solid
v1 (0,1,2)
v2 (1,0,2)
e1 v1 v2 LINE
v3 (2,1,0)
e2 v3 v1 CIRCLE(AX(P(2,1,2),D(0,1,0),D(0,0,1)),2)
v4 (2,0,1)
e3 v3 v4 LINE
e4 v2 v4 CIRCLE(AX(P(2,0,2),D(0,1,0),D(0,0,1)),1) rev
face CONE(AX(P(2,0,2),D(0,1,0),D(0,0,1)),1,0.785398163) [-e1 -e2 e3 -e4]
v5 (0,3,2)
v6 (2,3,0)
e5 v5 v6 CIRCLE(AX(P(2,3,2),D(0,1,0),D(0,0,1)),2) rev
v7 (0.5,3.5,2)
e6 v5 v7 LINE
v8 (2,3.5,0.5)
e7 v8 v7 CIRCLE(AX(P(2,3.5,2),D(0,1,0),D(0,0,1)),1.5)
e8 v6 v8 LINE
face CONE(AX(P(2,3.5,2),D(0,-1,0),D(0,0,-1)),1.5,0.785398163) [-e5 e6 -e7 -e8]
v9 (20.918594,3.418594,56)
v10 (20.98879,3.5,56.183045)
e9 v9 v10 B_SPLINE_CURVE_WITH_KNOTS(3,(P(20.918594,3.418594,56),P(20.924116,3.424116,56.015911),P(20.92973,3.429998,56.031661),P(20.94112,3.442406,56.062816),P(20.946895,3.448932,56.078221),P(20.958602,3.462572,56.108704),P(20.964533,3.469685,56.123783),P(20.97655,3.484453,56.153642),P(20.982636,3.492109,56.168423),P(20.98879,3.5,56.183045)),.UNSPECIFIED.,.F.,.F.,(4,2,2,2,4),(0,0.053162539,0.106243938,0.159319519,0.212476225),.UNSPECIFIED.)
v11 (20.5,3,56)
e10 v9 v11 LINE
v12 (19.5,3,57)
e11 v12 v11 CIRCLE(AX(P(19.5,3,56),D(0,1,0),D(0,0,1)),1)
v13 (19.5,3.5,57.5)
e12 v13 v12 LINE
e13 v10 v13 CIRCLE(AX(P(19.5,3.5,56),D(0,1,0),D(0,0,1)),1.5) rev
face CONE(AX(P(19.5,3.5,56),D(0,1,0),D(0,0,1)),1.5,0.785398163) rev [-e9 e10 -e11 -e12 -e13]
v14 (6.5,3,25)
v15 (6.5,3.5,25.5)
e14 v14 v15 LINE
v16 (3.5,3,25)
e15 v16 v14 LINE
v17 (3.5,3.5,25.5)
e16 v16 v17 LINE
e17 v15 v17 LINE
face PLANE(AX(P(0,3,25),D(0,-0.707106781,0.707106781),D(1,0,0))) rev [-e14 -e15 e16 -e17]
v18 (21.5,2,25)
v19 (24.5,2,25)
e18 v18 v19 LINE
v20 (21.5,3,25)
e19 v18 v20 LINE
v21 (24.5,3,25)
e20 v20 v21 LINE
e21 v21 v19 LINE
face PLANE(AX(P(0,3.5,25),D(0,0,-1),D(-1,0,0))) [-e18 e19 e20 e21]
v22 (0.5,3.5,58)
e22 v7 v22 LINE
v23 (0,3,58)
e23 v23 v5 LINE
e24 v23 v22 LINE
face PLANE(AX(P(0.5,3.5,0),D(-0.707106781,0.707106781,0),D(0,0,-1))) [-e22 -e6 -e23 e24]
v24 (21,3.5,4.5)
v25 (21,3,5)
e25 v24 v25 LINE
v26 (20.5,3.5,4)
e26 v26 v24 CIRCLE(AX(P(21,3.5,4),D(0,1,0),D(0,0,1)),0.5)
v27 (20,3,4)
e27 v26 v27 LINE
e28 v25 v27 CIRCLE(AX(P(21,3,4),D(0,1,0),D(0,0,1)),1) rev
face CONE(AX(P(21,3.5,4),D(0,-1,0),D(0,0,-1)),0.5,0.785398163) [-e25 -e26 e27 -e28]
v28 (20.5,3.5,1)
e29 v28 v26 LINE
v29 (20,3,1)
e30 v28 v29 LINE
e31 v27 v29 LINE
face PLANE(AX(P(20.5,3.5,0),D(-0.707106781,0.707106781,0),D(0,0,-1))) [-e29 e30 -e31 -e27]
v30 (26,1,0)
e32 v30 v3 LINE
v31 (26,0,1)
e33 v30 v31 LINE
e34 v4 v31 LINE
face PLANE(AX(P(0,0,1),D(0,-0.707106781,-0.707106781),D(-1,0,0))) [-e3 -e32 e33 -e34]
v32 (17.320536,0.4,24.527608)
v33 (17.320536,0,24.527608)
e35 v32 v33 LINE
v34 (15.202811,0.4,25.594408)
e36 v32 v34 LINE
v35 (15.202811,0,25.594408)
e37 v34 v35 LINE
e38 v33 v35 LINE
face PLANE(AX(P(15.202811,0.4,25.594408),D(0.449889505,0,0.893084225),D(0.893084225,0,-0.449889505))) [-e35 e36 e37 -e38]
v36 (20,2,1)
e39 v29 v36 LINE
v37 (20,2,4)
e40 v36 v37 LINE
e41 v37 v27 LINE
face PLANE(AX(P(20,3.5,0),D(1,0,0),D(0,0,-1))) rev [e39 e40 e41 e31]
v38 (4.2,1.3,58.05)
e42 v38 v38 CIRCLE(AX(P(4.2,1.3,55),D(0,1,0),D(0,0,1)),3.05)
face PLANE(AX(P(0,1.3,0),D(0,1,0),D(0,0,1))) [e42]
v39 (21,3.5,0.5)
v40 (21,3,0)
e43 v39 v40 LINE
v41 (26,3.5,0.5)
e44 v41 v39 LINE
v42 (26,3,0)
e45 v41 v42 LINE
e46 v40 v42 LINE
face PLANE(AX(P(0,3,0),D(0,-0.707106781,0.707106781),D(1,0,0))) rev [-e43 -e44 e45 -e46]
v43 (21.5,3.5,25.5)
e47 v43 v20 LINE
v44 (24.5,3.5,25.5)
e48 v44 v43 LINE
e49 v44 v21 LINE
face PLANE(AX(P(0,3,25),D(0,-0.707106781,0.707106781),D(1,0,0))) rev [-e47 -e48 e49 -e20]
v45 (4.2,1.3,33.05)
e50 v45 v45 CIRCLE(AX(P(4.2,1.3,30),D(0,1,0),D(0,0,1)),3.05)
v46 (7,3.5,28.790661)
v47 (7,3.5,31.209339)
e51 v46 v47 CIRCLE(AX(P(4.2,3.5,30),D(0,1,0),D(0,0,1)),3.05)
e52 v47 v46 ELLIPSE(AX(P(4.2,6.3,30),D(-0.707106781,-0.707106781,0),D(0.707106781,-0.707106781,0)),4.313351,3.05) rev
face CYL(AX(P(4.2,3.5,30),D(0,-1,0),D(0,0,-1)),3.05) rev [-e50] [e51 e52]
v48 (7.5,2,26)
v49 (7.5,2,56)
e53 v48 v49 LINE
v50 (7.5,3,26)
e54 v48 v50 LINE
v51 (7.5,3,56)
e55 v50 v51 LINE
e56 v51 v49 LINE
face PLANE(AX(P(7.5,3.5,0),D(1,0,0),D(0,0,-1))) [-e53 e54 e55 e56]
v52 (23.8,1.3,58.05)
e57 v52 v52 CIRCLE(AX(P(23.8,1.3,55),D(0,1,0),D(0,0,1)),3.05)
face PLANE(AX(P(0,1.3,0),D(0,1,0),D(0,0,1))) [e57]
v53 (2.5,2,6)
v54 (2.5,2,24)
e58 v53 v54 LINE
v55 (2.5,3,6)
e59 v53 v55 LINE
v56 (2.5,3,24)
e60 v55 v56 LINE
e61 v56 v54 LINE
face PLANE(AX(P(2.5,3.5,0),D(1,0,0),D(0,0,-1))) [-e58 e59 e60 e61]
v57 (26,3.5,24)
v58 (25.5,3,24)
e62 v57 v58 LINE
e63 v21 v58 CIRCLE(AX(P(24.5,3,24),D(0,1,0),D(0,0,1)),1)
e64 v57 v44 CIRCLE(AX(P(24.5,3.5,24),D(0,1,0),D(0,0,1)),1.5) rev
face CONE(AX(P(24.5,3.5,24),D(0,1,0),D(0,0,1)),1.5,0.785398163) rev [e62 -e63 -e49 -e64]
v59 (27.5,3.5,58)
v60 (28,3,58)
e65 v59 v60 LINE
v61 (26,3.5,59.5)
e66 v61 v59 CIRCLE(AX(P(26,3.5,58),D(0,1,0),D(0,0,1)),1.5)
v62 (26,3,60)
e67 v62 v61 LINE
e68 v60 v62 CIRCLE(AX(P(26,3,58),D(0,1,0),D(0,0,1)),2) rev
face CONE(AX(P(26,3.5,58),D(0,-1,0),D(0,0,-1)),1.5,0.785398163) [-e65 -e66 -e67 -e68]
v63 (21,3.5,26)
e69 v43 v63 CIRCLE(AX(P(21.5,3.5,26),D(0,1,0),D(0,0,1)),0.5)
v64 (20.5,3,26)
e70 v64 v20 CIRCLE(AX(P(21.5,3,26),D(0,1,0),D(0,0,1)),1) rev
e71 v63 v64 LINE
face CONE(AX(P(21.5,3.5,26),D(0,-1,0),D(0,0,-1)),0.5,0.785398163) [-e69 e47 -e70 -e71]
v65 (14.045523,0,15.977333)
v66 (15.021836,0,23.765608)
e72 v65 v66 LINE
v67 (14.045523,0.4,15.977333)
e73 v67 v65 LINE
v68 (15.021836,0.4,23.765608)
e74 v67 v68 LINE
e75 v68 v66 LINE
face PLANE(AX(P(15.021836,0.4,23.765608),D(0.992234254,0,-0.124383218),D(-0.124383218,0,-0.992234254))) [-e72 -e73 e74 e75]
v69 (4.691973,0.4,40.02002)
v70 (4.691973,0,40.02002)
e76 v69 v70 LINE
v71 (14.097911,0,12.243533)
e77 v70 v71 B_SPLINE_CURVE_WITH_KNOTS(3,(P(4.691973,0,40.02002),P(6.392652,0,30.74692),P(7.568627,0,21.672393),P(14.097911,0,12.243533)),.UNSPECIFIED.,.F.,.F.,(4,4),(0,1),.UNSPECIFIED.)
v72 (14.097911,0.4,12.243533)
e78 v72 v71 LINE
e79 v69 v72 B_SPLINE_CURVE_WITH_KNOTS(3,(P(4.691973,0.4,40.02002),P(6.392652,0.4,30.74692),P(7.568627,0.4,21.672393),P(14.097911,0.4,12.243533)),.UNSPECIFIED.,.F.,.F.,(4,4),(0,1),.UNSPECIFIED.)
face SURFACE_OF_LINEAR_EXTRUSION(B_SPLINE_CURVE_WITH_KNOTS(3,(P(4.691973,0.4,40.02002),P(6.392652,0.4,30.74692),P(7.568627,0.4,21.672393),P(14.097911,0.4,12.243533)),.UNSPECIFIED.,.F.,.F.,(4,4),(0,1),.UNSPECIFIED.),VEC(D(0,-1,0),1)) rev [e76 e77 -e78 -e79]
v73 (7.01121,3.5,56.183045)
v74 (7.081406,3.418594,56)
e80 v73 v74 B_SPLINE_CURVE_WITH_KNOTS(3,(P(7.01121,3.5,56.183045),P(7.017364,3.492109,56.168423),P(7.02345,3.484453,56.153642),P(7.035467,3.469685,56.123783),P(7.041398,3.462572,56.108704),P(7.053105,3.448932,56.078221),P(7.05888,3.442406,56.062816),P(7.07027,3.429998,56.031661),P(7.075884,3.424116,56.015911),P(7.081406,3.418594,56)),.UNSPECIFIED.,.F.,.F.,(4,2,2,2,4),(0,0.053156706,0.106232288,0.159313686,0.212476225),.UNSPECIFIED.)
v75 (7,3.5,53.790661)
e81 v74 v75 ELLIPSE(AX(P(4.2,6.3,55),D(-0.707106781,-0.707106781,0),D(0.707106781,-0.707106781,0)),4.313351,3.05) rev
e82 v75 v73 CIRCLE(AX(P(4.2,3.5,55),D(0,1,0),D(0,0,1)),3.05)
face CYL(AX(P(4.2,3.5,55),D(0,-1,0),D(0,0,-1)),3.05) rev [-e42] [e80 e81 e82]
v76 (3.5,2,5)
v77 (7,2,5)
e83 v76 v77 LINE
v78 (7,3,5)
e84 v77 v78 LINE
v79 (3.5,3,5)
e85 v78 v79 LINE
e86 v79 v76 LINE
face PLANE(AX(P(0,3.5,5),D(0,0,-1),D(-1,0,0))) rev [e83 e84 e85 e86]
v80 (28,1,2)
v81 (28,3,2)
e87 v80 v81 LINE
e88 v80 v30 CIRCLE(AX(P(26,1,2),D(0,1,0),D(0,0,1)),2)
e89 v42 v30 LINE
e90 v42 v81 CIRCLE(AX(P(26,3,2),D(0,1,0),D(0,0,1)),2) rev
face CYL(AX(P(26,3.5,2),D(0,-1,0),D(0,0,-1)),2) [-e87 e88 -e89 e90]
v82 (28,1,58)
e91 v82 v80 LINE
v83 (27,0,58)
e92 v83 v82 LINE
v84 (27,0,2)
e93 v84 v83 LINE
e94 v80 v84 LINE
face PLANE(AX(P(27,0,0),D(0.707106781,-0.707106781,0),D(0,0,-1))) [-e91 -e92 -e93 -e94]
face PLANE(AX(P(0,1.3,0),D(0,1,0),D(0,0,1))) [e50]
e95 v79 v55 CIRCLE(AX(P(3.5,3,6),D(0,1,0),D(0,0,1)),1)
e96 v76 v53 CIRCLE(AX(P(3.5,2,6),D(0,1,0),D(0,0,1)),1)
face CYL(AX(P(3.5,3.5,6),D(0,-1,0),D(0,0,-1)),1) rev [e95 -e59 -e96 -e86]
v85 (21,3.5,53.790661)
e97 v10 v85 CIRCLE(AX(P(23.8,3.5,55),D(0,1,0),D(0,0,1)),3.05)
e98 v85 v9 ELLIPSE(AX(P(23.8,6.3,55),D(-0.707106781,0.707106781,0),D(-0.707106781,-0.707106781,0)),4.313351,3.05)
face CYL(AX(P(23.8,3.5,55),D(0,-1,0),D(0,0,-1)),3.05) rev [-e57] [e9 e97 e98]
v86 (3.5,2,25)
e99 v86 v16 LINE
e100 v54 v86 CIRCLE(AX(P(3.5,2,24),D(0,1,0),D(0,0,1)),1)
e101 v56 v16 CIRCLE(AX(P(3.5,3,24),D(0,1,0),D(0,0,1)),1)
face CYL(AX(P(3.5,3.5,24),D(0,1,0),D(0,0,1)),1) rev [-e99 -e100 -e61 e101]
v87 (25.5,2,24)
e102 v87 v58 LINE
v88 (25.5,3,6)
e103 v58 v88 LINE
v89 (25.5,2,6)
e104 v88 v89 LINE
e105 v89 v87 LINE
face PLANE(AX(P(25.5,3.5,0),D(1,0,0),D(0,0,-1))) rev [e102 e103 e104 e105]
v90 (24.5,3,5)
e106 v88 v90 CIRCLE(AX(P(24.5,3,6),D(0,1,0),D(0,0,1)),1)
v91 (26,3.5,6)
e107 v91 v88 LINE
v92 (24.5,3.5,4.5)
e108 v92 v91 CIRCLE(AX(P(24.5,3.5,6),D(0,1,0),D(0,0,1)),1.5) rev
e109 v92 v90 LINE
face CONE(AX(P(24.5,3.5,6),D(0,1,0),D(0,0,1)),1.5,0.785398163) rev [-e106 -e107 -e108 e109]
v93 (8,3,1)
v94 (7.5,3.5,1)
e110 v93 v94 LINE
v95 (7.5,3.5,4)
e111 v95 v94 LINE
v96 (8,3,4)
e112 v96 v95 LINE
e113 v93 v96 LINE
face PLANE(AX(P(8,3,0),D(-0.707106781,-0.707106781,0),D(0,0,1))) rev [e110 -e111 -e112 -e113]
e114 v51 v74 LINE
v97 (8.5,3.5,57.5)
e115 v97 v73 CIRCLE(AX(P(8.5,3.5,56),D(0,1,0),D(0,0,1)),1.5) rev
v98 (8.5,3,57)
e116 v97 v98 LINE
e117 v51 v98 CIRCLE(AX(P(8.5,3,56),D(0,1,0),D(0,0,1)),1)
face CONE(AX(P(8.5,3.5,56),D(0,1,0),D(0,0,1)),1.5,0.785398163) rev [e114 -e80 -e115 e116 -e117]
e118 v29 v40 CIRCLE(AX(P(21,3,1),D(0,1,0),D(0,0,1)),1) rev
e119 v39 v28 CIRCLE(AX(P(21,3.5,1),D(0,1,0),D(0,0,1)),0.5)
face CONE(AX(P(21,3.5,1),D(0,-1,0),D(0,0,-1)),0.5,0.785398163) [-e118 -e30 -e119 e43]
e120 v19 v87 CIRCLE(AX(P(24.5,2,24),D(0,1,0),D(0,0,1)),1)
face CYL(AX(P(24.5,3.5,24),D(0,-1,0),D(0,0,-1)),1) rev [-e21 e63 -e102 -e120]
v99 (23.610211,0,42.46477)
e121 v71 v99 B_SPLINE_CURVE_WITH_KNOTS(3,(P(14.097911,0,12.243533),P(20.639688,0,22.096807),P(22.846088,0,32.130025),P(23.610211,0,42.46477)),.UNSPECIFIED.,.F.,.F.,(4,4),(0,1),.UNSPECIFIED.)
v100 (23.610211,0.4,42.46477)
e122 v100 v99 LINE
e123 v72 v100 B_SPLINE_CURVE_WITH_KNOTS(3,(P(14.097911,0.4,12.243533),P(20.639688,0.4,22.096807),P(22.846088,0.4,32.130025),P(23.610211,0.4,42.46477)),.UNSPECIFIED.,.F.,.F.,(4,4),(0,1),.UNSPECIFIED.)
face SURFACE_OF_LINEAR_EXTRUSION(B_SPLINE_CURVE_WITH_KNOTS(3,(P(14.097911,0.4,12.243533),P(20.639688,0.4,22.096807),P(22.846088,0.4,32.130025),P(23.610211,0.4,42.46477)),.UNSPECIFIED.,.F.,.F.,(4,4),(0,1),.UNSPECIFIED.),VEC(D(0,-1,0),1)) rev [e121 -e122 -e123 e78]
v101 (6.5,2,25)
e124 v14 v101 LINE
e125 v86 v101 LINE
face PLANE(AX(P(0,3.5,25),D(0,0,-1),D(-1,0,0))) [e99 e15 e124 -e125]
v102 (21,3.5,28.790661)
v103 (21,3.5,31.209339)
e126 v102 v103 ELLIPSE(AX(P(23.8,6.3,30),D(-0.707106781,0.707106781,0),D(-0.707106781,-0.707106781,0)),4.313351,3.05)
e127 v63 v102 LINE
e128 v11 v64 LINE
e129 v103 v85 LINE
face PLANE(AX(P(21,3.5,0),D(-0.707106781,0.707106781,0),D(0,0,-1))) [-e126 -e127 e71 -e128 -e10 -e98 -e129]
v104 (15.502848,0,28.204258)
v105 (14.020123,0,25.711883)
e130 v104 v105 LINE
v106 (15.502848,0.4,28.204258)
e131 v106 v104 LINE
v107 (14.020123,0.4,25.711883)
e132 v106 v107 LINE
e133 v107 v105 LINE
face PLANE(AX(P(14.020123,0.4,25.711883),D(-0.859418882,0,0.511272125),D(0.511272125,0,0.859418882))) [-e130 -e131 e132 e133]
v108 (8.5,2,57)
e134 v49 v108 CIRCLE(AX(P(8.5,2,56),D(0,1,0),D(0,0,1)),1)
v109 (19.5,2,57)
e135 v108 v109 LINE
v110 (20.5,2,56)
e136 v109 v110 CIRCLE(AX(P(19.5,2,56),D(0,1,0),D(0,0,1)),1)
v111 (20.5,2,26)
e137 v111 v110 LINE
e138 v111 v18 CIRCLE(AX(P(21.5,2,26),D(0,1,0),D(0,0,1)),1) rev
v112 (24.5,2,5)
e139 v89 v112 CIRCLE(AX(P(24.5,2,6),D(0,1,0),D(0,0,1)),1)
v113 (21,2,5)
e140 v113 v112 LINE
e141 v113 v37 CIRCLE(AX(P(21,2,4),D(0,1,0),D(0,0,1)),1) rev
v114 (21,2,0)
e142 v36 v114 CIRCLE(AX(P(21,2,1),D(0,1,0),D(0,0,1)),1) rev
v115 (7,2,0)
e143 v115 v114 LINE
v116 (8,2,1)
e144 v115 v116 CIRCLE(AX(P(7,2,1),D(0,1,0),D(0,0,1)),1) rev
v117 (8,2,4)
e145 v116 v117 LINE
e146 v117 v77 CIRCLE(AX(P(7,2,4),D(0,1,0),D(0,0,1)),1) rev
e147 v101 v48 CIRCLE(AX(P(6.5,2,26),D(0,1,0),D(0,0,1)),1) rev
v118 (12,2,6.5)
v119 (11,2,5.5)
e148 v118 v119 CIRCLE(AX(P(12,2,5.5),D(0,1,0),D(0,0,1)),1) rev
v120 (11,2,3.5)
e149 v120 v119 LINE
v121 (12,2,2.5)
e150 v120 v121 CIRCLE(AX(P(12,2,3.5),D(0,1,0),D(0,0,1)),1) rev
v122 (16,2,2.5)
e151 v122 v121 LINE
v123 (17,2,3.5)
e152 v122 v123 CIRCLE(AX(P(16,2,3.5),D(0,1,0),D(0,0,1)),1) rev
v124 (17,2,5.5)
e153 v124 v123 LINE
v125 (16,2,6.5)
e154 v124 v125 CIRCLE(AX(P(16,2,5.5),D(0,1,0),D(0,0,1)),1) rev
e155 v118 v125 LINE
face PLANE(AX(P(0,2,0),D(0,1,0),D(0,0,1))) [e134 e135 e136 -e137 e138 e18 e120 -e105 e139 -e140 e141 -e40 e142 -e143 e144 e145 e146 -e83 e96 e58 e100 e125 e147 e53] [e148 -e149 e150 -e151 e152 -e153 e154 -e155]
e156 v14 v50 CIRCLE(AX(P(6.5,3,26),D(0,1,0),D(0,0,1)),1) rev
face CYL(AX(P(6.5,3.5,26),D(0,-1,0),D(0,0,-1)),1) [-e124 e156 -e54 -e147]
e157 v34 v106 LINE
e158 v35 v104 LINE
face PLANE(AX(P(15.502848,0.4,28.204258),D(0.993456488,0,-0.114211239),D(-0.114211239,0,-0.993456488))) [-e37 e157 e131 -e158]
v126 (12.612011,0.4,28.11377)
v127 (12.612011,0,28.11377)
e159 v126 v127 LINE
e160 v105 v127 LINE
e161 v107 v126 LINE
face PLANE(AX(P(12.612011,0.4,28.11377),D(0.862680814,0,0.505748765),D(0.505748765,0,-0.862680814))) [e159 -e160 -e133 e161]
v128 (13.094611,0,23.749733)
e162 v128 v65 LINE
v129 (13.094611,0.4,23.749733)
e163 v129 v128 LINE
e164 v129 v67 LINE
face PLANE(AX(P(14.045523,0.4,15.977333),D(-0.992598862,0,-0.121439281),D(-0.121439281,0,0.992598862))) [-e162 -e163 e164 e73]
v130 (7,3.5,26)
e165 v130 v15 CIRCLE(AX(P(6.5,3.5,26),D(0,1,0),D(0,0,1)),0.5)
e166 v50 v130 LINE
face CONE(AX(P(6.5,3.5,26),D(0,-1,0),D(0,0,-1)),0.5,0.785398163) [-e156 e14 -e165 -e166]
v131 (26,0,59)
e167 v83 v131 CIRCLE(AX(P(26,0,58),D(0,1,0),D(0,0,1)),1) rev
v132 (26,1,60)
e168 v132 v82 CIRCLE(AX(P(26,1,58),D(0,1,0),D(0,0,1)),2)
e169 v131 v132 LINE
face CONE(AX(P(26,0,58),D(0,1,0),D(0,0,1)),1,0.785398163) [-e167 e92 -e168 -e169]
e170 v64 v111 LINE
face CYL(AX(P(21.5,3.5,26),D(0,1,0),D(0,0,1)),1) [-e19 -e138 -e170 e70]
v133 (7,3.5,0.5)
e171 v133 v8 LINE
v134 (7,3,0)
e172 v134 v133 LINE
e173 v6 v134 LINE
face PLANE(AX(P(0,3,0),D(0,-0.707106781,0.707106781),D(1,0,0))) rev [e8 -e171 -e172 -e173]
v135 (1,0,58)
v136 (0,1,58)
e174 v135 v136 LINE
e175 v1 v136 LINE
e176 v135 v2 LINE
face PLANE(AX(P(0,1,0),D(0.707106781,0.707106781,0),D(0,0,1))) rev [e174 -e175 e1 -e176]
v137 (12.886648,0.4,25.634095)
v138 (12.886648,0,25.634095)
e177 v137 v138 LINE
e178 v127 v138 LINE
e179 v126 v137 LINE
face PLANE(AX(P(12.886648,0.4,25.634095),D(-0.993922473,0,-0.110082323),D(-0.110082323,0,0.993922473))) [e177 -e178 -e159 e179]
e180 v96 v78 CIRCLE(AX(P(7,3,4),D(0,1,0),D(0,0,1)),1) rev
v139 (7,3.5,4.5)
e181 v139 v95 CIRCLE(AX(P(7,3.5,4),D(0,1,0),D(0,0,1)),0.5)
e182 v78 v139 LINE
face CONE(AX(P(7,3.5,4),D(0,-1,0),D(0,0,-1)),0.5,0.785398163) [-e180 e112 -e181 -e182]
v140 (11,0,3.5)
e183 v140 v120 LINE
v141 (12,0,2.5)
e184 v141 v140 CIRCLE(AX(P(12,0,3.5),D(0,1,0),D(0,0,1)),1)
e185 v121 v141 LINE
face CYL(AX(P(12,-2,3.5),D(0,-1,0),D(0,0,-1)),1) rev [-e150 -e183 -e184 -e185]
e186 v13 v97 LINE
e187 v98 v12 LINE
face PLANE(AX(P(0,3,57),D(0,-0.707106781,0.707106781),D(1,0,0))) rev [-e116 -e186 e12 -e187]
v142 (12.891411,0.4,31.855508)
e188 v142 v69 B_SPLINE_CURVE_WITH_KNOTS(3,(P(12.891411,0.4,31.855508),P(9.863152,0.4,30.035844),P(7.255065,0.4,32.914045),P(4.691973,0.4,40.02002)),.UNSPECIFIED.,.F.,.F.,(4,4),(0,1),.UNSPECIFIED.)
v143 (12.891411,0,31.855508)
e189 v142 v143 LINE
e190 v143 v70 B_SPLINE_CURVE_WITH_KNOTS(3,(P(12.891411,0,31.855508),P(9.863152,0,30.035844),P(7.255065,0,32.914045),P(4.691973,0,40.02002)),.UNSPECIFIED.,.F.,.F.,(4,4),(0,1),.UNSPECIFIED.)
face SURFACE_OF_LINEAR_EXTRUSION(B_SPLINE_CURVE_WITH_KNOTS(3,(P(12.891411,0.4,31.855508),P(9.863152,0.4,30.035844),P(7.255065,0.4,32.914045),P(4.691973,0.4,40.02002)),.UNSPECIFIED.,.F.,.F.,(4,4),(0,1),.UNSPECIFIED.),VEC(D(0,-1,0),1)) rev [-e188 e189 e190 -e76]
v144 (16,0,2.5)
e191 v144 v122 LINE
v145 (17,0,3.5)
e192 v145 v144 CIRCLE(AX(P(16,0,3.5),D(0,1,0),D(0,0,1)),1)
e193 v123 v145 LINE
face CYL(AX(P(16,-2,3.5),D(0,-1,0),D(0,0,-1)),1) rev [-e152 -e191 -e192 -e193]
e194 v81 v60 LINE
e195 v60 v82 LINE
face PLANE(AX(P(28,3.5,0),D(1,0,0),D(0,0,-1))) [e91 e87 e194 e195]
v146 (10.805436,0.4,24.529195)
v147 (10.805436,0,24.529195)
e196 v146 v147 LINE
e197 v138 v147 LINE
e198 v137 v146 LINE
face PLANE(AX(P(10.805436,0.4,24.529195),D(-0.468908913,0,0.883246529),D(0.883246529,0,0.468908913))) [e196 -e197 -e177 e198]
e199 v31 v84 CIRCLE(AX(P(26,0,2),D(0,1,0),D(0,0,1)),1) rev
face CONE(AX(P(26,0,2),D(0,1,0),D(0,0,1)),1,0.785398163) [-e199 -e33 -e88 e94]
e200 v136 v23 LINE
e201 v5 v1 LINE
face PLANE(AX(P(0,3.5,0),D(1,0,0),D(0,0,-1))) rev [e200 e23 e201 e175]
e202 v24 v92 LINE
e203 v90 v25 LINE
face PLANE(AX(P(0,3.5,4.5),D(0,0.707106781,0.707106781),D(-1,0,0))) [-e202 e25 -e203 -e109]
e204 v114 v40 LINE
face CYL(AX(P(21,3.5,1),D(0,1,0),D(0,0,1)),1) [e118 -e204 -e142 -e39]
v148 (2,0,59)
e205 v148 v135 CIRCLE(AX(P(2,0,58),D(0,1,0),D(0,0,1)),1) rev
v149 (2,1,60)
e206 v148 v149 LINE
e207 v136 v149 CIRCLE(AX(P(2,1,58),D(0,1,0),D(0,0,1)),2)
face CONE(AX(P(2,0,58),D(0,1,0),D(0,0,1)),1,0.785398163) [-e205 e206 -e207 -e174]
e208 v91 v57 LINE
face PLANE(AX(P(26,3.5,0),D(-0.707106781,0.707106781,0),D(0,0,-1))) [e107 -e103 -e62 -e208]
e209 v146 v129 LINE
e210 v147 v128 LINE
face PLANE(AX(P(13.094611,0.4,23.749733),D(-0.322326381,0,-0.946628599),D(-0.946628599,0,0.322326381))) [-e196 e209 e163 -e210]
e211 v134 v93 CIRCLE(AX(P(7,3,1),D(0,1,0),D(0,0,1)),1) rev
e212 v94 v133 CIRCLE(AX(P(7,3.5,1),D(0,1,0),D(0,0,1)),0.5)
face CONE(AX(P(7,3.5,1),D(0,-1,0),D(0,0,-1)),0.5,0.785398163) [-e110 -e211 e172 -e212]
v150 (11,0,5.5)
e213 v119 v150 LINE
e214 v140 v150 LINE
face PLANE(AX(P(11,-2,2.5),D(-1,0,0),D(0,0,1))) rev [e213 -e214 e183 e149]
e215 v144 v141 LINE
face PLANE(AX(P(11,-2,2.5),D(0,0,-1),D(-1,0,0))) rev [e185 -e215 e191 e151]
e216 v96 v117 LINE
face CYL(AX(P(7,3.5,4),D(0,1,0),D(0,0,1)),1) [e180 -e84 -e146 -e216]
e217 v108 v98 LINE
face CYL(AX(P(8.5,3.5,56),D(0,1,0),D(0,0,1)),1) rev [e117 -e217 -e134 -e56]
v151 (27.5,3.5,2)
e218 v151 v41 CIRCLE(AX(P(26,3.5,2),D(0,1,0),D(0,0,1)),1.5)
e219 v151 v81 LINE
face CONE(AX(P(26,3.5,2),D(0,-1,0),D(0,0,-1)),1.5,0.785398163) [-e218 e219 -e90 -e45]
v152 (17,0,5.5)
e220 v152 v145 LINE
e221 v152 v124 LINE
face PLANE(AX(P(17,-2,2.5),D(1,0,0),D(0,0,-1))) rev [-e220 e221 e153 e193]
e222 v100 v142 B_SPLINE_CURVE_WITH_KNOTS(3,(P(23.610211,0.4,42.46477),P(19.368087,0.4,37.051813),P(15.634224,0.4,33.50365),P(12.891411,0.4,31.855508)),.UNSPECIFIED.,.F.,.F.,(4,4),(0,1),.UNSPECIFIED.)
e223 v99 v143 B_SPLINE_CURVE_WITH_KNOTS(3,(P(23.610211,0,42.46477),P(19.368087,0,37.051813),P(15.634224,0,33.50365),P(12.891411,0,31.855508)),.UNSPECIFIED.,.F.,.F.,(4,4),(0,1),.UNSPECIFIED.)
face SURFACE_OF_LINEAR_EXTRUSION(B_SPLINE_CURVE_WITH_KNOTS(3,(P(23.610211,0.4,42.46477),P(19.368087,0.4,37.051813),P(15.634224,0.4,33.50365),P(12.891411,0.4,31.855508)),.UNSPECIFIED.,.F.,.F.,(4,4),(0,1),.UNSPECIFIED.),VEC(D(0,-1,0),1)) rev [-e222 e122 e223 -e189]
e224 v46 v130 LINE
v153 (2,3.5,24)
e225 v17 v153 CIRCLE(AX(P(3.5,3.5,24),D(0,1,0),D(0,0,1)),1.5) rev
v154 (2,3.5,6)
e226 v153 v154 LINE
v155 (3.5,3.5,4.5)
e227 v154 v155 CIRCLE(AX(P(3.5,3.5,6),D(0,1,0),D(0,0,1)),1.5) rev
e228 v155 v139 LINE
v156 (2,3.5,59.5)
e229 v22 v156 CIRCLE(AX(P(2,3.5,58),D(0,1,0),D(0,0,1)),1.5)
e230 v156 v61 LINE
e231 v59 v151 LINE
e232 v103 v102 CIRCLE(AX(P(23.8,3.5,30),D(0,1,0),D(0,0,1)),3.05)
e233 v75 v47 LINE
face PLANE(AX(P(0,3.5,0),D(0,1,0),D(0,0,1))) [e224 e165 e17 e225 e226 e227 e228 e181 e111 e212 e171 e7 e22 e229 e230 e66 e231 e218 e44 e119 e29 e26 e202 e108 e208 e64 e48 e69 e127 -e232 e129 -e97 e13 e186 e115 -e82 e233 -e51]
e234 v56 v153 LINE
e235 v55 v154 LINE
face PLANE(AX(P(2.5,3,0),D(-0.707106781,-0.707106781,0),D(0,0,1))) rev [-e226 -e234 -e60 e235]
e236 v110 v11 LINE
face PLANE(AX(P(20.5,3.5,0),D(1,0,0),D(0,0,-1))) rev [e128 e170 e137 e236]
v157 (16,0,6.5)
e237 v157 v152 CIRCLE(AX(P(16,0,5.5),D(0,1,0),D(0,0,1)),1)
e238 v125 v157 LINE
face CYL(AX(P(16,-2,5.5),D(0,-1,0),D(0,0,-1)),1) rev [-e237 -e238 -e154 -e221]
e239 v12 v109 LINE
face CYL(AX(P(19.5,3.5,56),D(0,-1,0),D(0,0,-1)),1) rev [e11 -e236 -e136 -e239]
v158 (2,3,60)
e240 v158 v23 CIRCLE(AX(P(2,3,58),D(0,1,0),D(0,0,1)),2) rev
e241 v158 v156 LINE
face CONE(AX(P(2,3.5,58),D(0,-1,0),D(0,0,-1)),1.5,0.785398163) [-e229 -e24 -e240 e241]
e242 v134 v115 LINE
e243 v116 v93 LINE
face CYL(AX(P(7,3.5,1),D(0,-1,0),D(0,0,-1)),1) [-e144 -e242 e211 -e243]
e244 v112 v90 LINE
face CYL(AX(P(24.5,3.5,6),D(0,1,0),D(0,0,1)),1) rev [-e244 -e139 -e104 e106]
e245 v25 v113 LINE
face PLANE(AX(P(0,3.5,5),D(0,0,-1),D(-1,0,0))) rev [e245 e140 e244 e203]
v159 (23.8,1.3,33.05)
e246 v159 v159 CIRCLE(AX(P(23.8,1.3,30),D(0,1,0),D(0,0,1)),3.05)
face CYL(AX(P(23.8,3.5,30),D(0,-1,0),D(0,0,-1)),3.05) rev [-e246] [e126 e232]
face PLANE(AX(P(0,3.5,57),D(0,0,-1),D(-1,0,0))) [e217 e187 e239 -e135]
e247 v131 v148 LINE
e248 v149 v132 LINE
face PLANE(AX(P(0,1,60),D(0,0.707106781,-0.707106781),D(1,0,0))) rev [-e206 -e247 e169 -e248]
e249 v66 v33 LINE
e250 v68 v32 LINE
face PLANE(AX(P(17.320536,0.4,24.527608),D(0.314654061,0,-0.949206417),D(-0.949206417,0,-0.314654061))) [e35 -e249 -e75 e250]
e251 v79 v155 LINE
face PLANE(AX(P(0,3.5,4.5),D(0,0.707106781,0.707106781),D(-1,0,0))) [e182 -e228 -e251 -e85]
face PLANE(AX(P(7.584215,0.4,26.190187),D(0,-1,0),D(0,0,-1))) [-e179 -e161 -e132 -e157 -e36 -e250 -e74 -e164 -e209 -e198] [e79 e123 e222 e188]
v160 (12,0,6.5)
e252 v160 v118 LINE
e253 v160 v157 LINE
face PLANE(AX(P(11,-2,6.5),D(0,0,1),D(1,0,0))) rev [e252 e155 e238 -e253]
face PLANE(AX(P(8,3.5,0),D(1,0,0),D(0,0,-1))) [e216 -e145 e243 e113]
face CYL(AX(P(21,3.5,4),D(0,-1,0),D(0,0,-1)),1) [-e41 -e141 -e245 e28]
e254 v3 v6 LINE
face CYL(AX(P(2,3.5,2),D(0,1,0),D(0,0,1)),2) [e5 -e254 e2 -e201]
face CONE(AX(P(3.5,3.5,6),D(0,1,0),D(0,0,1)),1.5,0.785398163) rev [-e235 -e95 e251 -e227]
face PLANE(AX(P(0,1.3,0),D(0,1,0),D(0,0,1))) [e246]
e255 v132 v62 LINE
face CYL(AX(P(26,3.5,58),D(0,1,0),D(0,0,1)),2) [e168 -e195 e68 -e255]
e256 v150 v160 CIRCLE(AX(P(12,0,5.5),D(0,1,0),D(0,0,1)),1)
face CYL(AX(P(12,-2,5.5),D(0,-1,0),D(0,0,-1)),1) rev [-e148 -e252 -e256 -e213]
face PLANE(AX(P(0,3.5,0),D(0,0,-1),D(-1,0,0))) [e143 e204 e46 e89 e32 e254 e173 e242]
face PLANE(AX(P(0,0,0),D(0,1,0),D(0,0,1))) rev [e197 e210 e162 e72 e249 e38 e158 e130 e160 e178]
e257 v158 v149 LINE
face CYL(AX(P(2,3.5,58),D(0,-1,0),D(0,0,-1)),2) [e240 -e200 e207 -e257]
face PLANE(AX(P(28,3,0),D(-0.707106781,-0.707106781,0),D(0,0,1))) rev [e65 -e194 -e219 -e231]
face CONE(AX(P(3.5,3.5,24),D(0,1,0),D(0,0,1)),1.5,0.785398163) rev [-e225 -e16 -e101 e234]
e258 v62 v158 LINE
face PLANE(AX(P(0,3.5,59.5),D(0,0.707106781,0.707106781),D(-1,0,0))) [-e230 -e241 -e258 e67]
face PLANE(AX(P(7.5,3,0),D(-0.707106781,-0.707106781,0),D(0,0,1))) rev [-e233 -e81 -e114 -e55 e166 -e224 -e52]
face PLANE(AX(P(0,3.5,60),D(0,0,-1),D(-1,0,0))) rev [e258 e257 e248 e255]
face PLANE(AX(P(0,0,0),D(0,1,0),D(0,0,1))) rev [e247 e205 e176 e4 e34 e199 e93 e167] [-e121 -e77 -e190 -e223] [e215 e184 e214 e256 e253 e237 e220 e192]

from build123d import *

# Parameters (mm, degrees)
SKETCH1_R           = 3.05
BOSS_EXTRUDE1_DEPTH = 3.5
SKETCH1_3_W         = 13
SKETCH1_3_H         = 32
SKETCH1_3_W_2       = 12
SKETCH1_3_H_2       = 5
BOSS_EXTRUDE2_DEPTH = 2
SKETCH1_4_R         = 3.05
BOSS_EXTRUDE3_DEPTH = 1.3
SKETCH2_W           = 6
SKETCH2_H           = 4
CUT_EXTRUDE1_DEPTH  = 4
FILLET1_R           = 1
FILLET2_R           = 1
FILLET3_R           = 1
FILLET4_R           = 2
CHAMFER1_SIZE       = 1
CHAMFER2_SIZE       = 0.5
CUT_EXTRUDE2_DEPTH  = 0.4


with BuildPart() as part:
    # Sketch1 → Boss-Extrude1 (new body)
    with BuildSketch(Plane(origin=(0, 0, 0), x_dir=(1, 0, 0), z_dir=(0, 1, 0))):
        Polygon((8, 0), (0, 0), (0, -60), (28, -60), (28, 0), (20, 0), (20, -5), (25.5, -5), (25.5, -25), (20.5, -25), (20.5, -57), (7.5, -57), (7.5, -25), (2.5, -25), (2.5, -5), (8, -5), align=None)
        with Locations(Location((4.2, -55, 0), (0, 0, 270))):
            Circle(SKETCH1_R, mode=Mode.SUBTRACT)
        with Locations(Location((4.2, -30, 0), (0, 0, 270))):
            Circle(SKETCH1_R, mode=Mode.SUBTRACT)
        with Locations(Location((23.8, -55, 0), (0, 0, 270))):
            Circle(SKETCH1_R, mode=Mode.SUBTRACT)
        with Locations(Location((23.8, -30, 0), (0, 0, 270))):
            Circle(SKETCH1_R, mode=Mode.SUBTRACT)
    extrude(amount=BOSS_EXTRUDE1_DEPTH)

    # Sketch1<3> → Boss-Extrude2 (add)
    with BuildSketch(Plane(origin=(0, 0, 0), x_dir=(1, 0, 0), z_dir=(0, 1, 0))):
        with Locations((14, -41)):
            Rectangle(SKETCH1_3_W, SKETCH1_3_H)
        Polygon((20, -5), (8, -5), (2.5, -5), (2.5, -25), (7.5, -25), (20.5, -25), (25.5, -25), (25.5, -5), align=None)
        with Locations((14, -2.5)):
            Rectangle(SKETCH1_3_W_2, SKETCH1_3_H_2)
    extrude(amount=BOSS_EXTRUDE2_DEPTH)

    # Sketch1<4> → Boss-Extrude3 (add)
    with BuildSketch(Plane(origin=(0, 0, 0), x_dir=(1, 0, 0), z_dir=(0, 1, 0))):
        with Locations(Location((4.2, -30, 0), (0, 0, 270))):
            Circle(SKETCH1_4_R)
        with Locations(Location((23.8, -30, 0), (0, 0, 270))):
            Circle(SKETCH1_4_R)
        with Locations(Location((4.2, -55, 0), (0, 0, 270))):
            Circle(SKETCH1_4_R)
        with Locations(Location((23.8, -55, 0), (0, 0, 270))):
            Circle(SKETCH1_4_R)
    extrude(amount=BOSS_EXTRUDE3_DEPTH)

    # Sketch2 → Cut-Extrude1 (cut)
    with BuildSketch(Plane(origin=(0, 2, 0), x_dir=(1, 0, 0), z_dir=(0, 1, 0))):
        with Locations((14, -4.5)):
            Rectangle(SKETCH2_W, SKETCH2_H)
    extrude(amount=-CUT_EXTRUDE1_DEPTH, mode=Mode.SUBTRACT)

    # Fillet1
    fillet1_edges = [part.edges().sort_by_distance(p)[0] for p in [
        (11, 1, 6.5),
        (11, 1, 2.5),
        (17, 1, 2.5),
        (17, 1, 6.5),
    ]]
    fillet(fillet1_edges, radius=FILLET1_R)

    # Fillet2
    fillet2_edges = [part.edges().sort_by_distance(p)[0] for p in [
        (25.5, 2.75, 25),
        (25.5, 2.75, 5),
        (20, 2.75, 5),
        (8, 2.75, 5),
        (2.5, 2.75, 5),
        (2.5, 2.75, 25),
        (7.5, 2.75, 25),
        (7.5, 2.75, 57),
        (20.5, 2.75, 57),
        (20.5, 2.75, 25),
    ]]
    fillet(fillet2_edges, radius=FILLET2_R)

    # Fillet3
    fillet3_edges = [part.edges().sort_by_distance(p)[0] for p in [
        (20, 2.75, 0),
        (8, 2.75, 0),
    ]]
    fillet(fillet3_edges, radius=FILLET3_R)

    # Fillet4
    fillet4_edges = [part.edges().sort_by_distance(p)[0] for p in [
        (28, 1.75, 0),
        (28, 1.75, 60),
        (0, 1.75, 60),
        (0, 1.75, 0),
    ]]
    fillet(fillet4_edges, radius=FILLET4_R)

    # Chamfer1
    chamfer1_edges = [part.edges().sort_by_distance(p)[0] for p in [
        (28, 0, 30),
        (0, 0, 30),
        (14, 0, 0),
        (14, 0, 60),
        (0.585786438, 0, 0.585786438),
        (27.414213562, 0, 0.585786438),
        (0.585786438, 0, 59.414213562),
        (27.414213562, 0, 59.414213562),
    ]]
    chamfer(chamfer1_edges, length=CHAMFER1_SIZE)

    # Chamfer2
    # the kernel refuses this chamfer: 0.5 mm, written as the material it takes off along each edge
    with BuildSketch(Plane(origin=(8.5, 3.5, 56), x_dir=(-1, 0, 0), z_dir=(0, 0, -1))) as chamfer2_piece_1:
        Polygon((1 + CHAMFER2_SIZE, 0), (1, -CHAMFER2_SIZE), (1, 0), align=None)
    revolve(axis=Axis((8.5, 3.5, 56), (0, 1, 0)), revolution_arc=90, mode=Mode.SUBTRACT)
    with BuildSketch(Plane(origin=(7.5, 3.5, 56), x_dir=(-0.9996219169112968, 0.02749587661058651, 0), z_dir=(0, 0, -1)), Plane(origin=(20.5, 3.5, 26), x_dir=(0.9996219169112968, 0.027495876610586414, 0), z_dir=(0, 0, 1))) as chamfer2_piece_2:
        Polygon((CHAMFER2_SIZE * 0.999621916911, -CHAMFER2_SIZE * 0.0274958766106), (-CHAMFER2_SIZE * 0.0274958766106, -CHAMFER2_SIZE * 0.999621916911), (0, 0), align=None)
    extrude(amount=30, mode=Mode.SUBTRACT)
    with BuildSketch(Plane(origin=(19.5, 3.5, 57), x_dir=(0, 0.027495876610586605, 0.9996219169112968), z_dir=(-1, 0, 0))) as chamfer2_piece_3:
        Polygon((CHAMFER2_SIZE * 0.999621916911, -CHAMFER2_SIZE * 0.0274958766106), (-CHAMFER2_SIZE * 0.0274958766106, -CHAMFER2_SIZE * 0.999621916911), (0, 0), align=None)
    extrude(amount=11, mode=Mode.SUBTRACT)
    with BuildSketch(Plane(origin=(6.5, 3.5, 26), x_dir=(0, 0, -1), z_dir=(-1, 0, 0))) as chamfer2_piece_4:
        Polygon((1 - CHAMFER2_SIZE, 0), (1, CHAMFER2_SIZE), (1, 0), align=None)
    revolve(axis=Axis((6.5, 3.5, 26), (0, -1, 0)), revolution_arc=90, mode=Mode.SUBTRACT)
    with BuildSketch(Plane(origin=(19.5, 3.5, 56), x_dir=(0, 0, 1), z_dir=(-1, 0, 0))) as chamfer2_piece_5:
        Polygon((1 + CHAMFER2_SIZE, 0), (1, -CHAMFER2_SIZE), (1, 0), align=None)
    revolve(axis=Axis((19.5, 3.5, 56), (0, 1, 0)), revolution_arc=90, mode=Mode.SUBTRACT)
    with BuildSketch(Plane(origin=(6.5, 3.5, 25), x_dir=(0, 0.027495876610586414, 0.9996219169112968), z_dir=(-1, 0, 0)), Plane(origin=(24.5, 3.5, 25), x_dir=(0, 0.027495876610586414, 0.9996219169112968), z_dir=(-1, 0, 0)), Plane(origin=(8, 3.5, 4), x_dir=(-0.9996219169112968, 0.02749587661058651, 0), z_dir=(0, 0, -1)), Plane(origin=(20, 3.5, 1), x_dir=(0.9996219169112968, 0.027495876610586414, 0), z_dir=(0, 0, 1))) as chamfer2_piece_6:
        Polygon((CHAMFER2_SIZE * 0.999621916911, -CHAMFER2_SIZE * 0.0274958766106), (-CHAMFER2_SIZE * 0.0274958766106, -CHAMFER2_SIZE * 0.999621916911), (0, 0), align=None)
    extrude(amount=3, mode=Mode.SUBTRACT)
    with BuildSketch(Plane(origin=(3.5, 3.5, 24), x_dir=(-1, 0, 0), z_dir=(0, 0, -1))) as chamfer2_piece_7:
        Polygon((1 + CHAMFER2_SIZE, 0), (1, -CHAMFER2_SIZE), (1, 0), align=None)
    revolve(axis=Axis((3.5, 3.5, 24), (0, 1, 0)), revolution_arc=90, mode=Mode.SUBTRACT)
    with BuildSketch(Plane(origin=(21.5, 3.5, 26), x_dir=(-1, 0, 0), z_dir=(0, 0, 1))) as chamfer2_piece_8:
        Polygon((1 - CHAMFER2_SIZE, 0), (1, CHAMFER2_SIZE), (1, 0), align=None)
    revolve(axis=Axis((21.5, 3.5, 26), (0, -1, 0)), revolution_arc=90, mode=Mode.SUBTRACT)
    with BuildSketch(Plane(origin=(2.5, 3.5, 24), x_dir=(-0.9996219169112968, 0.027495876610586438, 0), z_dir=(0, 0, -1)), Plane(origin=(25.5, 3.5, 6), x_dir=(0.9996219169112968, 0.027495876610586414, 0), z_dir=(0, 0, 1))) as chamfer2_piece_9:
        Polygon((CHAMFER2_SIZE * 0.999621916911, -CHAMFER2_SIZE * 0.0274958766106), (-CHAMFER2_SIZE * 0.0274958766106, -CHAMFER2_SIZE * 0.999621916911), (0, 0), align=None)
    extrude(amount=18, mode=Mode.SUBTRACT)
    with BuildSketch(Plane(origin=(3.5, 3.5, 6), x_dir=(0, 0, -1), z_dir=(1, 0, 0))) as chamfer2_piece_10:
        Polygon((1 + CHAMFER2_SIZE, 0), (1, -CHAMFER2_SIZE), (1, 0), align=None)
    revolve(axis=Axis((3.5, 3.5, 6), (0, 1, 0)), revolution_arc=90, mode=Mode.SUBTRACT)
    with BuildSketch(Plane(origin=(24.5, 3.5, 24), x_dir=(1, 0, 0), z_dir=(0, 0, -1))) as chamfer2_piece_11:
        Polygon((1 + CHAMFER2_SIZE, 0), (1, CHAMFER2_SIZE), (1, 0), align=None)
    revolve(axis=Axis((24.5, 3.5, 24), (0, -1, 0)), revolution_arc=90, mode=Mode.SUBTRACT)
    with BuildSketch(Plane(origin=(3.5, 3.5, 5), x_dir=(0, 0.02749587661058651, -0.9996219169112968), z_dir=(1, 0, 0)), Plane(origin=(21, 3.5, 5), x_dir=(0, 0.027495876610586414, -0.9996219169112968), z_dir=(1, 0, 0))) as chamfer2_piece_12:
        Polygon((CHAMFER2_SIZE * 0.999621916911, -CHAMFER2_SIZE * 0.0274958766106), (-CHAMFER2_SIZE * 0.0274958766106, -CHAMFER2_SIZE * 0.999621916911), (0, 0), align=None)
    extrude(amount=3.5, mode=Mode.SUBTRACT)
    with BuildSketch(Plane(origin=(7, 3.5, 4), x_dir=(0, 0, 1), z_dir=(-1, 0, 0))) as chamfer2_piece_13:
        Polygon((1 - CHAMFER2_SIZE, 0), (1, -CHAMFER2_SIZE), (1, 0), align=None)
    revolve(axis=Axis((7, 3.5, 4), (0, 1, 0)), revolution_arc=90, mode=Mode.SUBTRACT)
    with BuildSketch(Plane(origin=(24.5, 3.5, 6), x_dir=(0, 0, -1), z_dir=(-1, 0, 0))) as chamfer2_piece_14:
        Polygon((1 + CHAMFER2_SIZE, 0), (1, CHAMFER2_SIZE), (1, 0), align=None)
    revolve(axis=Axis((24.5, 3.5, 6), (0, -1, 0)), revolution_arc=90, mode=Mode.SUBTRACT)
    with BuildSketch(Plane(origin=(7, 3.5, 1), x_dir=(1, 0, 0), z_dir=(0, 0, 1))) as chamfer2_piece_15:
        Polygon((1 - CHAMFER2_SIZE, 0), (1, -CHAMFER2_SIZE), (1, 0), align=None)
    revolve(axis=Axis((7, 3.5, 1), (0, 1, 0)), revolution_arc=90, mode=Mode.SUBTRACT)
    with BuildSketch(Plane(origin=(21, 3.5, 4), x_dir=(-1, 0, 0), z_dir=(0, 0, -1))) as chamfer2_piece_16:
        Polygon((1 - CHAMFER2_SIZE, 0), (1, -CHAMFER2_SIZE), (1, 0), align=None)
    revolve(axis=Axis((21, 3.5, 4), (0, 1, 0)), revolution_arc=90, mode=Mode.SUBTRACT)
    with BuildSketch(Plane(origin=(7, 3.5, 0), x_dir=(0, -0.9996219169112968, -0.027495876610586365), z_dir=(-1, 0, 0)), Plane(origin=(26, 3.5, 0), x_dir=(0, -0.9996219169112968, -0.027495876610586365), z_dir=(-1, 0, 0))) as chamfer2_piece_17:
        Polygon((CHAMFER2_SIZE * 0.999621916911, CHAMFER2_SIZE * 0.0274958766106), (-CHAMFER2_SIZE * 0.0274958766106, CHAMFER2_SIZE * 0.999621916911), (0, 0), align=None)
    extrude(amount=5, mode=Mode.SUBTRACT)
    with BuildSketch(Plane(origin=(2, 3.5, 2), x_dir=(-1, 0, 0), z_dir=(0, 0, 1))) as chamfer2_piece_18:
        Polygon((2, CHAMFER2_SIZE), (2 - CHAMFER2_SIZE, 0), (2, 0), align=None)
    revolve(axis=Axis((2, 3.5, 2), (0, -1, 0)), revolution_arc=90, mode=Mode.SUBTRACT)
    with BuildSketch(Plane(origin=(21, 3.5, 1), x_dir=(0, 0, -1), z_dir=(1, 0, 0))) as chamfer2_piece_19:
        Polygon((1 - CHAMFER2_SIZE, 0), (1, -CHAMFER2_SIZE), (1, 0), align=None)
    revolve(axis=Axis((21, 3.5, 1), (0, 1, 0)), revolution_arc=90, mode=Mode.SUBTRACT)
    with BuildSketch(Plane(origin=(0, 3.5, 2), x_dir=(-0.02749587661058636, -0.9996219169112968, 0), z_dir=(0, 0, 1)), Plane(origin=(28, 3.5, 58), x_dir=(0.02749587661058907, -0.9996219169112965, 0), z_dir=(0, 0, -1))) as chamfer2_piece_20:
        Polygon((CHAMFER2_SIZE * 0.999621916911, CHAMFER2_SIZE * 0.0274958766106), (-CHAMFER2_SIZE * 0.0274958766106, CHAMFER2_SIZE * 0.999621916911), (0, 0), align=None)
    extrude(amount=56, mode=Mode.SUBTRACT)
    with BuildSketch(Plane(origin=(2, 3.5, 58), x_dir=(0, 0, 1), z_dir=(1, 0, 0))) as chamfer2_piece_21:
        Polygon((2, CHAMFER2_SIZE), (2 - CHAMFER2_SIZE, 0), (2, 0), align=None)
    revolve(axis=Axis((2, 3.5, 58), (0, -1, 0)), revolution_arc=90, mode=Mode.SUBTRACT)
    with BuildSketch(Plane(origin=(26, 3.5, 2), x_dir=(1, 0, 0), z_dir=(0, 0, 1))) as chamfer2_piece_22:
        Polygon((2, -CHAMFER2_SIZE), (2 - CHAMFER2_SIZE, 0), (2, 0), align=None)
    revolve(axis=Axis((26, 3.5, 2), (0, 1, 0)), revolution_arc=90, mode=Mode.SUBTRACT)
    with BuildSketch(Plane(origin=(2, 3.5, 60), x_dir=(0, -0.999621916911297, 0.027495876610582174), z_dir=(1, 0, 0))) as chamfer2_piece_23:
        Polygon((CHAMFER2_SIZE * 0.999621916911, CHAMFER2_SIZE * 0.0274958766106), (-CHAMFER2_SIZE * 0.0274958766106, CHAMFER2_SIZE * 0.999621916911), (0, 0), align=None)
    extrude(amount=24, mode=Mode.SUBTRACT)
    with BuildSketch(Plane(origin=(26, 3.5, 58), x_dir=(1, 0, 0), z_dir=(0, 0, -1))) as chamfer2_piece_24:
        Polygon((2, CHAMFER2_SIZE), (2 - CHAMFER2_SIZE, 0), (2, 0), align=None)
    revolve(axis=Axis((26, 3.5, 58), (0, -1, 0)), revolution_arc=90, mode=Mode.SUBTRACT)

    # Sketch3 → Cut-Extrude2 (cut)
    with BuildSketch(Plane.XZ):
        with BuildLine():
            add(Edge.make_bspline(
                [(14.097910653, 12.243532923), (20.639688273, 22.096806587), (22.846088229, 32.130025027), (23.610210653, 42.464770423)],
                knots=[0, 0, 0, 0, 1, 1, 1, 1], degree=3))
            add(Edge.make_bspline(
                [(23.610210653, 42.464770423), (19.368087057, 37.051812999), (15.634224065, 33.503649915), (12.891410653, 31.855507923)],
                knots=[0, 0, 0, 0, 1, 1, 1, 1], degree=3))
            add(Edge.make_bspline(
                [(12.891410653, 31.855507923), (9.863152041, 30.035843795), (7.255065309, 32.914045303), (4.691973153, 40.020020423)],
                knots=[0, 0, 0, 0, 1, 1, 1, 1], degree=3))
            add(Edge.make_bspline(
                [(4.691973153, 40.020020423), (6.392651997, 30.746919843), (7.568627293, 21.672393415), (14.097910653, 12.243532923)],
                knots=[0, 0, 0, 0, 1, 1, 1, 1], degree=3))
        make_face()
        Polygon((14.045523153, 15.977332923), (13.094610653, 23.749732923), (10.805435653, 24.529195423), (12.886648153, 25.634095423), (12.612010653, 28.113770423), (14.020123153, 25.711882923), (15.502848153, 28.204257923), (15.202810653, 25.594407923), (17.320535653, 24.527607923), (15.021835653, 23.765607923), align=None, mode=Mode.SUBTRACT)
    extrude(amount=-CUT_EXTRUDE2_DEPTH, mode=Mode.SUBTRACT)


solid = part.part
